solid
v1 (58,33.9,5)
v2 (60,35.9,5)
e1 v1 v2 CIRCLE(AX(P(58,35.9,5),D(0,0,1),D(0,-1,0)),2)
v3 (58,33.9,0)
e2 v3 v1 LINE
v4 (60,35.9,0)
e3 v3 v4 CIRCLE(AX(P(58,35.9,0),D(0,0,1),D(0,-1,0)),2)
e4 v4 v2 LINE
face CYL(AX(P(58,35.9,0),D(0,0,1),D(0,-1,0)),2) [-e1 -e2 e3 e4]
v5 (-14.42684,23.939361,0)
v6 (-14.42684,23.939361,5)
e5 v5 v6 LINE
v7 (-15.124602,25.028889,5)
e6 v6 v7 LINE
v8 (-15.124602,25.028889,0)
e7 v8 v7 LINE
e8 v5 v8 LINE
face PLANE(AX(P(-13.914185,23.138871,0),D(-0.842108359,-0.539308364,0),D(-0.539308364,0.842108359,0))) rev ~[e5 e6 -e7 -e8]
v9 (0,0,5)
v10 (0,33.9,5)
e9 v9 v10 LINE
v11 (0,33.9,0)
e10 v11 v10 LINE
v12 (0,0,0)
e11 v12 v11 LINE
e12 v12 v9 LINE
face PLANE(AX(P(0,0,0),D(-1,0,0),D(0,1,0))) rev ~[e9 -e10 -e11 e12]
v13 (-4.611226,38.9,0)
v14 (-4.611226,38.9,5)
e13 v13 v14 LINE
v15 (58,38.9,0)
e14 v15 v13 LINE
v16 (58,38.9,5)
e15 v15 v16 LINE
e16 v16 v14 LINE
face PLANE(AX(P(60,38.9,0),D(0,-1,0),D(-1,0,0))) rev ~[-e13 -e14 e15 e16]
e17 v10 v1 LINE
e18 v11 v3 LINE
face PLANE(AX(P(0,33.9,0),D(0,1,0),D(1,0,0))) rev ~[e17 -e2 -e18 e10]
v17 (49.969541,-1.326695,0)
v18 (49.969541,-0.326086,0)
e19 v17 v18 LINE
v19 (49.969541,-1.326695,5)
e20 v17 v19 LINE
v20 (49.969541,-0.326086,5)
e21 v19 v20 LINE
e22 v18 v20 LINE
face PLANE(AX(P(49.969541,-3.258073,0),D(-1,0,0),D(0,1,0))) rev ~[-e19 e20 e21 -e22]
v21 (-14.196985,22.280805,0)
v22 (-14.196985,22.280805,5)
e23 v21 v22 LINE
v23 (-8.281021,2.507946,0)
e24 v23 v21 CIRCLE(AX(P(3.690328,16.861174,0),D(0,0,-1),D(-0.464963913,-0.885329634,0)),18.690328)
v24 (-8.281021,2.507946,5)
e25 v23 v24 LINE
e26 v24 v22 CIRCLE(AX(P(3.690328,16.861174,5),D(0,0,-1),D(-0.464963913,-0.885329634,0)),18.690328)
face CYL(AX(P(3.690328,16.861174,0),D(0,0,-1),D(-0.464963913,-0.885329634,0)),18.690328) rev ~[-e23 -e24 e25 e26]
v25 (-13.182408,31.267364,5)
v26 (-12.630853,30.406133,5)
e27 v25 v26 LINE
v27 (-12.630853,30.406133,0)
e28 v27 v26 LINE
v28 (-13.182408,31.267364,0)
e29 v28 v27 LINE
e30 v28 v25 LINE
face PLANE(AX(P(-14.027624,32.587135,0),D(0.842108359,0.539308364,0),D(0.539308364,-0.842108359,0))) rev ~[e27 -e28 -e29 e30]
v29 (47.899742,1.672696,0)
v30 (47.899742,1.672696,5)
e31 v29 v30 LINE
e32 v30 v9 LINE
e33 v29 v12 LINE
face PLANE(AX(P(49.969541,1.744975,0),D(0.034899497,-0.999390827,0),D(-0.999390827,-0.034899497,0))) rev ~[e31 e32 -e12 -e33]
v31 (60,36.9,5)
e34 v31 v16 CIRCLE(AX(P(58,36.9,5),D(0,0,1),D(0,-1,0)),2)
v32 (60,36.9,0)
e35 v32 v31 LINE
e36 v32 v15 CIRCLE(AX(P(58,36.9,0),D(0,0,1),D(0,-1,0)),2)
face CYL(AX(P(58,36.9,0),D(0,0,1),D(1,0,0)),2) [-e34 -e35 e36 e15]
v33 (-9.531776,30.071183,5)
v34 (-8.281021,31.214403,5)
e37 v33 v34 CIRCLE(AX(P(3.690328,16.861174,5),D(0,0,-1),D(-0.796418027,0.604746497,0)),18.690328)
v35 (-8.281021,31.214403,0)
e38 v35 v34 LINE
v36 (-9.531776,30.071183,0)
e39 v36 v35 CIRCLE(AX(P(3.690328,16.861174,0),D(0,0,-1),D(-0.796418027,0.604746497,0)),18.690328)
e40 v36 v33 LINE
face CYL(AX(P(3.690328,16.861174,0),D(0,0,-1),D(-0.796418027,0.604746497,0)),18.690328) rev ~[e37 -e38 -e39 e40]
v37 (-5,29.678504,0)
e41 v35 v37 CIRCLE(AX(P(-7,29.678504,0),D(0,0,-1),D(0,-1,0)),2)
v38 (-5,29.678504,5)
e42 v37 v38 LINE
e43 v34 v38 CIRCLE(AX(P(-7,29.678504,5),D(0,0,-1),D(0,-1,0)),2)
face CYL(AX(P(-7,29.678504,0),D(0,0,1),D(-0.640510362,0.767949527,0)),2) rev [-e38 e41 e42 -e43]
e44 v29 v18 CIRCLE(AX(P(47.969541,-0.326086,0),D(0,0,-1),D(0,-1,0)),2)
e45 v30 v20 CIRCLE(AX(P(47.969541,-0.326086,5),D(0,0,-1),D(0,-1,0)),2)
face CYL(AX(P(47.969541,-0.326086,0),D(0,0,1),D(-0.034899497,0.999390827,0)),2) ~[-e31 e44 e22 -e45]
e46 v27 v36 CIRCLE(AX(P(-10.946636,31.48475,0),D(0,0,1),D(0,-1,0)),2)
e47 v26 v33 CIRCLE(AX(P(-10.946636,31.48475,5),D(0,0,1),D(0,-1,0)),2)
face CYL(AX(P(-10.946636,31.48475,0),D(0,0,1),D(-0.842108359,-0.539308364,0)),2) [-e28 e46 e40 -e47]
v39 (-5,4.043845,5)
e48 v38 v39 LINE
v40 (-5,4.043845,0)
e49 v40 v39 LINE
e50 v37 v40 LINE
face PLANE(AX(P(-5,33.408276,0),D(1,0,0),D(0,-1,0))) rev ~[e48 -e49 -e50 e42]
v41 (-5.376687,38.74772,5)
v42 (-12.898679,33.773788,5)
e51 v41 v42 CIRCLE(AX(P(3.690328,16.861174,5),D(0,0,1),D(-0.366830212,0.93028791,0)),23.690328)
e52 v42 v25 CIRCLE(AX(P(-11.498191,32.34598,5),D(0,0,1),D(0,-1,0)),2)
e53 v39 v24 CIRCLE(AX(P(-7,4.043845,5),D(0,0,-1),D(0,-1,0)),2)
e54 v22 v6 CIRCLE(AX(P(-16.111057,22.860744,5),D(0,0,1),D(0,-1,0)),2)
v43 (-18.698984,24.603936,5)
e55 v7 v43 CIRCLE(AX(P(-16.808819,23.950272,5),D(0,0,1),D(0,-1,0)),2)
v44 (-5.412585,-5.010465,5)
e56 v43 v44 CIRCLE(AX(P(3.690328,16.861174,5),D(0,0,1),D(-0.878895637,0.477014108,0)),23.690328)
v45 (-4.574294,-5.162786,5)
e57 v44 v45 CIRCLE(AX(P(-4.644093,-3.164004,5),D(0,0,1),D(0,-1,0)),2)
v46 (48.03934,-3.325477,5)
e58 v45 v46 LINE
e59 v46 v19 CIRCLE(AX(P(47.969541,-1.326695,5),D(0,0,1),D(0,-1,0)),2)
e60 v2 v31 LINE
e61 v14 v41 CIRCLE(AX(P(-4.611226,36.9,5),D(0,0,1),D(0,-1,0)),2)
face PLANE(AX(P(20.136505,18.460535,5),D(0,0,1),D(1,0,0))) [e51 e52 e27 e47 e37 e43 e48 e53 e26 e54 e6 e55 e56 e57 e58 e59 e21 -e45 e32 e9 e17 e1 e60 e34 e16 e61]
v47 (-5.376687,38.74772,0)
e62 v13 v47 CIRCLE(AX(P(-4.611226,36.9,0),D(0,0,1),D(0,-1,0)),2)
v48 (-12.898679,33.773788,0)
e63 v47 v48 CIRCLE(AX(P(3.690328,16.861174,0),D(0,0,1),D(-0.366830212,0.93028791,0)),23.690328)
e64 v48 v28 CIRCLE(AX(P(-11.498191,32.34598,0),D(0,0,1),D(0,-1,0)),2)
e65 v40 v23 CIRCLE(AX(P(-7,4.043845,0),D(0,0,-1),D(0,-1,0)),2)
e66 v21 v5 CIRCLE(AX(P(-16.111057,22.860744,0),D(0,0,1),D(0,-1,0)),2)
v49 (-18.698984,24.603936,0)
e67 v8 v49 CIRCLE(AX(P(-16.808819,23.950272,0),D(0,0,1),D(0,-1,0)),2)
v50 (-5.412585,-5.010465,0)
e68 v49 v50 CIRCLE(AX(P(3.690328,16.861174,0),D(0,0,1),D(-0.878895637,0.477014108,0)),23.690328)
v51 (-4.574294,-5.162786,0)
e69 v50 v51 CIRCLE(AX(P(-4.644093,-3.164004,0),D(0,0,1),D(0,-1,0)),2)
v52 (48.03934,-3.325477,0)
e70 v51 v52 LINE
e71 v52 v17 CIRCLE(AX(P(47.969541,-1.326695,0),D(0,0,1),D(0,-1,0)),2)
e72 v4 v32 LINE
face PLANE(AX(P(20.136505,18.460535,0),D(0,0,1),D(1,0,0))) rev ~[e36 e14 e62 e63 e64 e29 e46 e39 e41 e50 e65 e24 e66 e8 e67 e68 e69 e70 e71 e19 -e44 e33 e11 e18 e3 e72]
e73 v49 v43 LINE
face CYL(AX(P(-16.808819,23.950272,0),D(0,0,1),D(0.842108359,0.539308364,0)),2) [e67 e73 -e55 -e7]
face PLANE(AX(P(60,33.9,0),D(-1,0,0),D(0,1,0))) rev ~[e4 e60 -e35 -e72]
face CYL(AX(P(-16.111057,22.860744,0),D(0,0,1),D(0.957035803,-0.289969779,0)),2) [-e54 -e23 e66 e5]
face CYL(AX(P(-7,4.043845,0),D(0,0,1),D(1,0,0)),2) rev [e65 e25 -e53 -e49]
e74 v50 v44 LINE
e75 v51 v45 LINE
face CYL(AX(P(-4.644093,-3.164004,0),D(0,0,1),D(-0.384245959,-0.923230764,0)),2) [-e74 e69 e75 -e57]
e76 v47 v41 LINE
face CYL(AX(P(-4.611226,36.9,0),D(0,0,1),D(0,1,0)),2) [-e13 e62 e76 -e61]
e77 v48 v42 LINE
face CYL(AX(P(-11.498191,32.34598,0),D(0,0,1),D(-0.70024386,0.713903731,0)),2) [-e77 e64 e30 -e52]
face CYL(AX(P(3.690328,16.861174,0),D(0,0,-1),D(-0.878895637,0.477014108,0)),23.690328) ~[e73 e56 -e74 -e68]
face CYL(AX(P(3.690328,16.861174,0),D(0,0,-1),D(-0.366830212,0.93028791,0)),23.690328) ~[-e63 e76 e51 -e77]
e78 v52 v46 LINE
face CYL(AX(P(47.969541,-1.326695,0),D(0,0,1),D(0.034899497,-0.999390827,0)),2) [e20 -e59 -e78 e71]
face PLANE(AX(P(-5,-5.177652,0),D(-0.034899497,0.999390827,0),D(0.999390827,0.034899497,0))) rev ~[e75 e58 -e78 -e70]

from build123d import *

# Parameters (mm, degrees)
F1_DEPTH = 5
F2_R     = 2


with BuildPart() as f1:
    # F0 (on Top) → F1 (new body)
    with BuildSketch(Plane.XY):
        Polygon((49.969541351, 1.7449748351), (0, 0), (0, 33.9), (60, 33.9), (60, 38.9), (-5, 38.9), (-5, 33.4082755117), (-5, 0.3140729194), (-5, -5.177651569), (49.969541351, -3.2580728864), align=None)
        with BuildLine():
            Line((-5, 33.4082755117), (-5, 38.9))
            ThreePointArc((-5, 38.9), (-9.8858414628, 36.2755829056), (-14.0276237399, 32.5871345254))
            Line((-14.0276237399, 32.5871345254), (-11.1949861447, 28.1640846398))
            ThreePointArc((-11.1949861447, 28.1640846398), (-8.385603023, 31.1265256497), (-5, 33.4082755117))
        make_face()
        with BuildLine():
            ThreePointArc((-17.1309979161, 28.161794916), (-18.5720640821, 8.7607088143), (-5, -5.177651569))
            Line((-5, -5.177651569), (-5, 0.3140729194))
            ThreePointArc((-5, 0.3140729194), (-13.7193681247, 10.061847649), (-13.9141851806, 23.1388709719))
            Line((-13.9141851806, 23.1388709719), (-17.1309979161, 28.161794916))
        make_face()
    extrude(amount=F1_DEPTH)

    # F2
    f2_edges = [f1.edges().sort_by_distance(p)[0] for p in [
        (49.969541, 1.744975, 2.5),
        (49.969541, -3.258073, 2.5),
        (-5, -5.177652, 2.5),
        (-5, 0.314073, 2.5),
        (-5, 33.408276, 2.5),
        (60, 33.9, 2.5),
        (-17.130998, 28.161795, 2.5),
        (-14.027624, 32.587135, 2.5),
        (-13.914185, 23.138871, 2.5),
        (-11.194986, 28.164085, 2.5),
        (-5, 38.9, 2.5),
        (60, 38.9, 2.5),
    ]]
    fillet(f2_edges, radius=F2_R)


solid = f1.part
